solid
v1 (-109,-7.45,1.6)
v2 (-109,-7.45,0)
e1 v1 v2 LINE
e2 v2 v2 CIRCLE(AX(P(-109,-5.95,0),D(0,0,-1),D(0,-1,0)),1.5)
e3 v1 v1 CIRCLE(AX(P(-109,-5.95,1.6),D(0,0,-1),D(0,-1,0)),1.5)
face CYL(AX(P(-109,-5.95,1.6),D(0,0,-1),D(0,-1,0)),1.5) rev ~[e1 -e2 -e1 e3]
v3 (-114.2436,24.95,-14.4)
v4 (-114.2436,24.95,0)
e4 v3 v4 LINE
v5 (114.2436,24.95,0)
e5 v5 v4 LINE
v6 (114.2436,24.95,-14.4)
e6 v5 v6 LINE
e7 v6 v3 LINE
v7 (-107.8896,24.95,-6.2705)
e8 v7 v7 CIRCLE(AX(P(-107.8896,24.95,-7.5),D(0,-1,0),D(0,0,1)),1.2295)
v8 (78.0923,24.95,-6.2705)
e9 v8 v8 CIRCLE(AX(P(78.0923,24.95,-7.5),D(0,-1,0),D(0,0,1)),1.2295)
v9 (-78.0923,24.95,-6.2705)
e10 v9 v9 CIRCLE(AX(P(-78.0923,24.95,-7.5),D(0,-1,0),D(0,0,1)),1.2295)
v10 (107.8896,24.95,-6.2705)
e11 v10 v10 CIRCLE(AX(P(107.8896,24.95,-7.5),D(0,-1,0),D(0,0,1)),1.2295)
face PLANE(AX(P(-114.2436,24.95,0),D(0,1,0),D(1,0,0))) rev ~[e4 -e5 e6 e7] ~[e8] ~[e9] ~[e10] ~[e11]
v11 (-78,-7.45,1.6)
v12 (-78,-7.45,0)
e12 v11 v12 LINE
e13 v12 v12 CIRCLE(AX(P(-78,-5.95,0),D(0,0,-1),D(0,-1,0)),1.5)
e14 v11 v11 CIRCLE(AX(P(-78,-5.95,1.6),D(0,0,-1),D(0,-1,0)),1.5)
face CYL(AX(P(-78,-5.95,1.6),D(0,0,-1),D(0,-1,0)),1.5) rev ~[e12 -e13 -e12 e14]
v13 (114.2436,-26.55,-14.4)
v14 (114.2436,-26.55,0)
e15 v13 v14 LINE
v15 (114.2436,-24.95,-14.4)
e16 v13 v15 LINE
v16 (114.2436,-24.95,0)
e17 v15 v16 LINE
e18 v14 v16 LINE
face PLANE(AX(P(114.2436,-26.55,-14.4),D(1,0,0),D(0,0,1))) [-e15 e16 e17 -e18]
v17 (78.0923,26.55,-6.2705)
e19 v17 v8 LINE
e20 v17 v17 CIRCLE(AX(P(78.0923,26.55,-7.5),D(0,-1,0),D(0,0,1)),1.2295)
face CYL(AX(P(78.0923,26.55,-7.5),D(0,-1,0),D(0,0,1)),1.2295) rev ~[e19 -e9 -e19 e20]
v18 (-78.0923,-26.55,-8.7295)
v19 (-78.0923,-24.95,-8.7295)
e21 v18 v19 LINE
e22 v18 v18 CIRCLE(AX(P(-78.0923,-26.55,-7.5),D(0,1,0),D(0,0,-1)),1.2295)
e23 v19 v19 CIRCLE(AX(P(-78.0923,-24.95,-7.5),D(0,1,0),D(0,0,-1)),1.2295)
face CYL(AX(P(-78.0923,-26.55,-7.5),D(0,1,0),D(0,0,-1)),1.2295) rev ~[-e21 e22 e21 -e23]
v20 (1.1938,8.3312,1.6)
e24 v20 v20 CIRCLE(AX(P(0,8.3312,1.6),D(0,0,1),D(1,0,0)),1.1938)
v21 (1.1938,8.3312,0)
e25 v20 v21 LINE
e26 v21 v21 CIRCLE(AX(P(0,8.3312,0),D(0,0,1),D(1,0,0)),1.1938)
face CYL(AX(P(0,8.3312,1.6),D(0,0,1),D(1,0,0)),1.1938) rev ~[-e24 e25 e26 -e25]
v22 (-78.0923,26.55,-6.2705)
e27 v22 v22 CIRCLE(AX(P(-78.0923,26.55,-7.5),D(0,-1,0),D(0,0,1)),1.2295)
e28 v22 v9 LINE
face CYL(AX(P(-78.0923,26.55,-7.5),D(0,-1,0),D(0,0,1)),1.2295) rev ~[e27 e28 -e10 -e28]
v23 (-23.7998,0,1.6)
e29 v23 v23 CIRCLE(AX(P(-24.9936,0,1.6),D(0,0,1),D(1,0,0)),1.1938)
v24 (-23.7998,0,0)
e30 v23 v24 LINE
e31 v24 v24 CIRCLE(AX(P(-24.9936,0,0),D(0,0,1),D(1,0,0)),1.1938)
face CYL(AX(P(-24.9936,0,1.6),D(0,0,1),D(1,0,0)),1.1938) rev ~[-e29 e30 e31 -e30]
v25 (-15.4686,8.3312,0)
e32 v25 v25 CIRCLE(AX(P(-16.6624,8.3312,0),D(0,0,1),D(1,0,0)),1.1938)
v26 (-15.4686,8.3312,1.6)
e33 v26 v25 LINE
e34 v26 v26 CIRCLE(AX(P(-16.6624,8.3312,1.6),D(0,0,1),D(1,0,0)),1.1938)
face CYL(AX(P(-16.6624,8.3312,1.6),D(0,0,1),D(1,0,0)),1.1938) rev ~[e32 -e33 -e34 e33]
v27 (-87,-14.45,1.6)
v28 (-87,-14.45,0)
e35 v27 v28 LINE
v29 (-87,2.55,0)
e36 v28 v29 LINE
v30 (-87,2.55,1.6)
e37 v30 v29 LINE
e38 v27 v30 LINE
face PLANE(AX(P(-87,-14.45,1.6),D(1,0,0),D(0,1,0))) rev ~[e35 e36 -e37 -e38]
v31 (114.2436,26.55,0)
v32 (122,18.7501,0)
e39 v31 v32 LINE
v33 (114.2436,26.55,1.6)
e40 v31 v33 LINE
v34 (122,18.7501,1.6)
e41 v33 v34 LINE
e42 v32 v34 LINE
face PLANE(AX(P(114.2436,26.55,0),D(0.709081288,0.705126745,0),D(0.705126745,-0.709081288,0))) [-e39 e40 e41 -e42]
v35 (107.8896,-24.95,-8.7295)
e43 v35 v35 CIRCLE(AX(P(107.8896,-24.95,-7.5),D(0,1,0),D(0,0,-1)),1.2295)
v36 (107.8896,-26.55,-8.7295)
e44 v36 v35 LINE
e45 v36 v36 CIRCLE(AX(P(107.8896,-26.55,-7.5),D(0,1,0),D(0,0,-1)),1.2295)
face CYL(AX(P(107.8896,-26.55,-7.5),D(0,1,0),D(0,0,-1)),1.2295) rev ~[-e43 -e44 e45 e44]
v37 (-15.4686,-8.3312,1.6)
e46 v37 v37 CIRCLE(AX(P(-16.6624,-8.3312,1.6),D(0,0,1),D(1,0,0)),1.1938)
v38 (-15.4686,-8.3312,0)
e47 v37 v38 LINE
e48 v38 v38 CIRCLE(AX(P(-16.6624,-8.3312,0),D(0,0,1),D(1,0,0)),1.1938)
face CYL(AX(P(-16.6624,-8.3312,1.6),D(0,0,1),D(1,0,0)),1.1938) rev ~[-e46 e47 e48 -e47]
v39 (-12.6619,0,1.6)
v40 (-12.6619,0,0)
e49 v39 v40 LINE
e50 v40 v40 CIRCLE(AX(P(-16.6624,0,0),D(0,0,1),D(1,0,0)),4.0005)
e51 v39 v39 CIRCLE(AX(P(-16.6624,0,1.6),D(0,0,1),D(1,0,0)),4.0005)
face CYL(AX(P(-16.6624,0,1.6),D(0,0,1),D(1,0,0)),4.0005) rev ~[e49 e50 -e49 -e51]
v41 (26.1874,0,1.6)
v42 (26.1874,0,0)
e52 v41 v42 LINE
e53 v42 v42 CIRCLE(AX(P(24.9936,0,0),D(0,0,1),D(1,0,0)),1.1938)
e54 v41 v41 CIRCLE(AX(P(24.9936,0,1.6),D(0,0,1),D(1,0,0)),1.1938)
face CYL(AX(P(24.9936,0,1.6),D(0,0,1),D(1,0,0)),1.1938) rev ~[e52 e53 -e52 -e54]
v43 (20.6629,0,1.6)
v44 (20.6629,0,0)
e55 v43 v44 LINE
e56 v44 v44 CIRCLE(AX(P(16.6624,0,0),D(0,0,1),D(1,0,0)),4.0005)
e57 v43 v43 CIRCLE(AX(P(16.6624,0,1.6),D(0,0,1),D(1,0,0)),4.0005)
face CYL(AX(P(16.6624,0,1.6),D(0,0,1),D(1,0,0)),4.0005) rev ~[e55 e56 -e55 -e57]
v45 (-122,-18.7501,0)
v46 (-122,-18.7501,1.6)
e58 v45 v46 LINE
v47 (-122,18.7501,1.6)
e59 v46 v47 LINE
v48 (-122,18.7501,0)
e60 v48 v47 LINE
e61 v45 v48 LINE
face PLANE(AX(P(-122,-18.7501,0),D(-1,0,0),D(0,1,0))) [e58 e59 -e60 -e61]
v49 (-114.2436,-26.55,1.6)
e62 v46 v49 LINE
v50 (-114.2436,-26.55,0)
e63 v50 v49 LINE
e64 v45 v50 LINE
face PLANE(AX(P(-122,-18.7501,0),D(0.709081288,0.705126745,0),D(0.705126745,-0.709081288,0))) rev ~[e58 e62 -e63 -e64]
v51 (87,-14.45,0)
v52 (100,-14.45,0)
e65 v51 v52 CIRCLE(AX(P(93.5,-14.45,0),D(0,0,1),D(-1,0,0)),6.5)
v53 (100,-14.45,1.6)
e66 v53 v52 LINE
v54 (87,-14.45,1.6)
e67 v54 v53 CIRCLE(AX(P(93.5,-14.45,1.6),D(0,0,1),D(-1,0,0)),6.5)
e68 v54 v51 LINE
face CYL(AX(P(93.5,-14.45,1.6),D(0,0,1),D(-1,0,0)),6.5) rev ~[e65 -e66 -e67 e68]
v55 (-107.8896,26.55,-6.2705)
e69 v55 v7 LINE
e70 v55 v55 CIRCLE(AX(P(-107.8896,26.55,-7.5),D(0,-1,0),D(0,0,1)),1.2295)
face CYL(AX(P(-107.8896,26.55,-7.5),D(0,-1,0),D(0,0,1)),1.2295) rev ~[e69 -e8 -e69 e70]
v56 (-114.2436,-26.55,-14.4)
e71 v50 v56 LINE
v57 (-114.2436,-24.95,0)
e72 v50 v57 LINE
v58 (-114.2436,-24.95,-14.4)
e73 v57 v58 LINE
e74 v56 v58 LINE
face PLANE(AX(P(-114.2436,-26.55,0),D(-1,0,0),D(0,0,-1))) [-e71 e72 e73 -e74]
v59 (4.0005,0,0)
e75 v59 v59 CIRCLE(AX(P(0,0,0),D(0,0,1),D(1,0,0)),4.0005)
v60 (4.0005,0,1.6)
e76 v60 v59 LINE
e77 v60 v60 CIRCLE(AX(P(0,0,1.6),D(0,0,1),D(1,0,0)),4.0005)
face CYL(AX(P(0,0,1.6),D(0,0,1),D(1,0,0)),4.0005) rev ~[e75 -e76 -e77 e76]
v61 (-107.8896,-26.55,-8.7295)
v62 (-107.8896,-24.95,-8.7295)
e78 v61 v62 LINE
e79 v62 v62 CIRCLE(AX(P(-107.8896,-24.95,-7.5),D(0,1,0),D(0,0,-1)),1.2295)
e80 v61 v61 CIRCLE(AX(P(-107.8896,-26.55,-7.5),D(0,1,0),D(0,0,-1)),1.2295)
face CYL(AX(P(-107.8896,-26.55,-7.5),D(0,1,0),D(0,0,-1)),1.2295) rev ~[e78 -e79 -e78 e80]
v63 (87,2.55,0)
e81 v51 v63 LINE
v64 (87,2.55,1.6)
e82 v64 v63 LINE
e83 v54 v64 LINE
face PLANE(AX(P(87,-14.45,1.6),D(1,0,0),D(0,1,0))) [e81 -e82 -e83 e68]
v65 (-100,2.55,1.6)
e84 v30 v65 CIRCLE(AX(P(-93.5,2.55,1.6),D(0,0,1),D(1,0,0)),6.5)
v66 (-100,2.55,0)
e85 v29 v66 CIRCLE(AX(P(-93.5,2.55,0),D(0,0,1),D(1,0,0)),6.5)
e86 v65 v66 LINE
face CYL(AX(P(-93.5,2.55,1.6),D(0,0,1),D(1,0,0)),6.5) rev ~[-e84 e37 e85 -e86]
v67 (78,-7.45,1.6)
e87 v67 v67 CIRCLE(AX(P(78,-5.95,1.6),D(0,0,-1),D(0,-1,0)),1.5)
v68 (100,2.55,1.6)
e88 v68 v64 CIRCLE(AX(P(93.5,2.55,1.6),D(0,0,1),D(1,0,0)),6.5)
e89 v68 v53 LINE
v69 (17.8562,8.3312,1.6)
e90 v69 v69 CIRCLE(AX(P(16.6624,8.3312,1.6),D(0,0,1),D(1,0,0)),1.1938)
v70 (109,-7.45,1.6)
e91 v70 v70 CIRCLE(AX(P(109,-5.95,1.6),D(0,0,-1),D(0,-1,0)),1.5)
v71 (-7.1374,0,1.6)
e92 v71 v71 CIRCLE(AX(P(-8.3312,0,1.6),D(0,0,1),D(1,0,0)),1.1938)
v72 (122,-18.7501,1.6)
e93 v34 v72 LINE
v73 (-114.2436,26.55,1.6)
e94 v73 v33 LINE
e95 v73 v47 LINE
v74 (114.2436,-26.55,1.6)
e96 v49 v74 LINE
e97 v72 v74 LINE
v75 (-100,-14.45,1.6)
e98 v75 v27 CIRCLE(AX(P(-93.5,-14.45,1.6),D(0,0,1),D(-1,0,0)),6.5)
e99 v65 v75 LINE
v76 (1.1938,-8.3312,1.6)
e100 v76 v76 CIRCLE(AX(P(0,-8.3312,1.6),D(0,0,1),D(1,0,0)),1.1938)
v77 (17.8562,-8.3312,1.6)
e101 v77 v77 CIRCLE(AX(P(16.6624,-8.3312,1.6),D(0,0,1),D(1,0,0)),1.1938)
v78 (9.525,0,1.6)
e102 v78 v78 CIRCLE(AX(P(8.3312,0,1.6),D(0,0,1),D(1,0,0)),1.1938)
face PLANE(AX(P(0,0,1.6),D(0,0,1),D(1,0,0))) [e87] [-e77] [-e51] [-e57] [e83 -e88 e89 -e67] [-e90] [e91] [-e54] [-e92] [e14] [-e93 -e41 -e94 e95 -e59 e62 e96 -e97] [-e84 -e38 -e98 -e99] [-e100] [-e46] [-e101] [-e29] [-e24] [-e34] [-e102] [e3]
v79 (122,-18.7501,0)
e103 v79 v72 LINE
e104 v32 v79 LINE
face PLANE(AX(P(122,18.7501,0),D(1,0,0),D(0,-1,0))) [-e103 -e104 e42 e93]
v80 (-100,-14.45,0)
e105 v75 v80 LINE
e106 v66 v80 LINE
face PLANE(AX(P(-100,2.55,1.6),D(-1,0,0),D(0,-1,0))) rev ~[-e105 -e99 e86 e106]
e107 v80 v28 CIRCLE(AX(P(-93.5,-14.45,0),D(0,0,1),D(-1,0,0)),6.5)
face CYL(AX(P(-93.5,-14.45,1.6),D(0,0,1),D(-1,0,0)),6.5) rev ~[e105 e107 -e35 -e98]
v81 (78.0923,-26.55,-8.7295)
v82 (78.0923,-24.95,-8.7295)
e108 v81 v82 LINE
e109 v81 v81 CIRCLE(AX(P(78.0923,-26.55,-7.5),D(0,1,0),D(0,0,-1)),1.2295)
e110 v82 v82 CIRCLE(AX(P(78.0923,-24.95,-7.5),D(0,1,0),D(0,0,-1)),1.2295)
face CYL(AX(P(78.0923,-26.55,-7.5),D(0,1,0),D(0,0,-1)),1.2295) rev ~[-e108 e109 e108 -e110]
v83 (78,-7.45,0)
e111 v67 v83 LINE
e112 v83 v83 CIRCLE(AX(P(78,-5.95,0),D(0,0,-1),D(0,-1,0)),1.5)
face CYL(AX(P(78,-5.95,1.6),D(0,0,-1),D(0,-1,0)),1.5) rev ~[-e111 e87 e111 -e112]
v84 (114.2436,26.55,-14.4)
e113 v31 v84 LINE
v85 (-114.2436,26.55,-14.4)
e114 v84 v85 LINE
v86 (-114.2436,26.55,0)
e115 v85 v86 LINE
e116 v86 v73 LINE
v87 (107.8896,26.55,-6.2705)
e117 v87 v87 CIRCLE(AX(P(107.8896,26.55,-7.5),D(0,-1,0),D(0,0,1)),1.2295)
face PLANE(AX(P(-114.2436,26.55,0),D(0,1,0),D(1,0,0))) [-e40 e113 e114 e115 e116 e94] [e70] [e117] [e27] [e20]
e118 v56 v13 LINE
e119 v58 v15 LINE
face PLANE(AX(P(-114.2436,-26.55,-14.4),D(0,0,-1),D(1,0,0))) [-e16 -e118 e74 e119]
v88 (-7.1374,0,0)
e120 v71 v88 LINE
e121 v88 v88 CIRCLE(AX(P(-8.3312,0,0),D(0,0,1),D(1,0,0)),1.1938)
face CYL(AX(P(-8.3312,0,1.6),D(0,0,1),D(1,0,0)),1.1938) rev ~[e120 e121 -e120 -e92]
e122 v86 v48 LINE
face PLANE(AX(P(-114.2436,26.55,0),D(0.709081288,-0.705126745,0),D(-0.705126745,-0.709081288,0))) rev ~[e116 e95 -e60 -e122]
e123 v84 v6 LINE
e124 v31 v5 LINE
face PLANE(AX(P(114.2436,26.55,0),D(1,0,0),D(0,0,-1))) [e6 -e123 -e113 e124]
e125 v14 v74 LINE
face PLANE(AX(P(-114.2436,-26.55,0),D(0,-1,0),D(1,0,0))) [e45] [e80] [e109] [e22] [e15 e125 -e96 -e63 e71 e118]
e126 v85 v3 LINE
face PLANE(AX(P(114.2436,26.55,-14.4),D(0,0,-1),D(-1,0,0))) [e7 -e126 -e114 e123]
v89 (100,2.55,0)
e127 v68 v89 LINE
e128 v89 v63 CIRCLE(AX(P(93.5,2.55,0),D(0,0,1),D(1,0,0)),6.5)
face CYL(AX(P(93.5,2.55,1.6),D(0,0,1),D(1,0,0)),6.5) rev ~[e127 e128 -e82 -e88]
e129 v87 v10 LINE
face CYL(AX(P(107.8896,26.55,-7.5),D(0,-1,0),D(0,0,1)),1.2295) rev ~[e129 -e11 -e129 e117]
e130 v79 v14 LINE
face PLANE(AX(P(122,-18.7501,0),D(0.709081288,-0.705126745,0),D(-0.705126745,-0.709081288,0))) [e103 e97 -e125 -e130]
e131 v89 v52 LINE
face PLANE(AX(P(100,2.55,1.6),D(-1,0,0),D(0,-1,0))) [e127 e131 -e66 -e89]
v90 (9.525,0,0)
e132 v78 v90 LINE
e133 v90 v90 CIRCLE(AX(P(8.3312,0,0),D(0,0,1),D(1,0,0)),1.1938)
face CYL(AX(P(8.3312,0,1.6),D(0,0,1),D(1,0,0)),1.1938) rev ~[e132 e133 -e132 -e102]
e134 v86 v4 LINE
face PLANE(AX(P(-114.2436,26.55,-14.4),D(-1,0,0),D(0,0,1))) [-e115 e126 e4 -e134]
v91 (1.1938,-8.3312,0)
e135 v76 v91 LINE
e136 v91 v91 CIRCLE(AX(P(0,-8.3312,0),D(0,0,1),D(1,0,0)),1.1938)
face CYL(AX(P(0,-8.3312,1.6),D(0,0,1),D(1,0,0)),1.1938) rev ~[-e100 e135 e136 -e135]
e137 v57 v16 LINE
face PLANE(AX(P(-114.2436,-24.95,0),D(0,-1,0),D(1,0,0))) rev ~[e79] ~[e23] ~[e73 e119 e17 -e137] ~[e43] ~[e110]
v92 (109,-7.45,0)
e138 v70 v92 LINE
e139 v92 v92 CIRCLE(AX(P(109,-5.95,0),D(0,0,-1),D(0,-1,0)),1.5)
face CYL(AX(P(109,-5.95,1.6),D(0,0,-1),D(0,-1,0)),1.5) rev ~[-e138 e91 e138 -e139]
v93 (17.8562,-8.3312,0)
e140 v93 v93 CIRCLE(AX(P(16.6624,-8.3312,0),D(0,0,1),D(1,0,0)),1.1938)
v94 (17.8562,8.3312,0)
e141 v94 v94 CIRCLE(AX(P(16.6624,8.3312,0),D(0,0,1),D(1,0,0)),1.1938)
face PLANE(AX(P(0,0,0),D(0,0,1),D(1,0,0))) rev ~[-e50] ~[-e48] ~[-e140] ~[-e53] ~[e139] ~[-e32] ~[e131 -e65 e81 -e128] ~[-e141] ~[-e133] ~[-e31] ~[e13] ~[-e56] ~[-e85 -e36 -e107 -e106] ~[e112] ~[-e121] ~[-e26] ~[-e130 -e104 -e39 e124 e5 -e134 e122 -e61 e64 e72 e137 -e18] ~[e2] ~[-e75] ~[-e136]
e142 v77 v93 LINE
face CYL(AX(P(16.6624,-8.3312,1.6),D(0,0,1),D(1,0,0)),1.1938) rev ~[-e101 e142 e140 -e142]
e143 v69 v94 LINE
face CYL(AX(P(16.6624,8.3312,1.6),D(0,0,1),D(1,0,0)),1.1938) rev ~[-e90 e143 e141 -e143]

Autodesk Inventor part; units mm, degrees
ref_plane "YZ Plane" through (0, 0, 0) normal (1, 0, 0) x (0, 1, 0)
ref_plane "XZ Plane" through (0, 0, 0) normal (0, 1, 0) x (-1, 0, 0)
ref_plane "XY Plane" through (0, 0, 0) normal (0, 0, 1) x (1, 0, 0)
sketch "Sketch1" plane through (0, 0, 0) normal (0, 0, 1) x (1, 0, 0)
  line L0 (-114.2436, 26.55) -> (114.2436, 26.55)
  line L1 (122, 18.7501) -> (122, -18.7501)
  line L2 (114.2436, -26.55) -> (-114.2436, -26.55)
  line L3 (-122, -18.7501) -> (-122, 18.7501)
  line L4 (114.2436, 26.55) -> (122, 18.7501)
  line L5 (122, -18.7501) -> (114.2436, -26.55)
  line L6 (0, 26.55) -> (0, -26.55)
  line L7 (-114.2436, 26.55) -> (-122, 18.7501)
  line L8 (-122, -18.7501) -> (-114.2436, -26.55)
  point P0 (0, 0)
  point P1 (-122, 0)
  point P2 (0, 26.55)
  point P3 (0, 0)
  dimension "d0" = 244
  dimension "d62" = 135.16
  dimension "d63" = 11
  dimension "d64" = 135.16
  dimension "d65" = 11
  dimension "d66" = 53.1
extrude "Extrusion5" add sketch "Sketch1" along normal blind 1.6
sketch "Sketch11" plane through (-114.2436, 26.55, 0) normal (0, 1, 0) x (1, 0, 0)
  line L0 (228.4872, 0) -> (0, 0) projected
  line L1 (0, 0) -> (0, -1.6) projected
  line L2 (228.4872, -1.6) -> (0, -1.6) projected
  line L3 (228.4872, 0) -> (228.4872, -1.6) projected
  line L4 (228.4872, 0) -> (0, 0) projected
  line L5 (0, 0) -> (228.4872, 0)
  line L6 (228.4872, 0) -> (228.4872, 14.4)
  line L7 (228.4872, 14.4) -> (0, 14.4)
  line L8 (0, 14.4) -> (0, 0)
  point P0 (114.2436, 0)
  dimension "d72" = 14.4
extrude "Extrusion6" add sketch "Sketch11" against normal blind 1.6 contours L0 L8 L7 L6
sketch "Sketch12" plane through (-114.2436, -26.55, 0) normal (0, -1, 0) x (1, 0, 0)
  line L0 (228.4872, -14.4) -> (228.4872, 0) projected
  line L1 (0, 0) -> (228.4872, 0) projected
  line L2 (0, 0) -> (0, -14.4) projected
  line L3 (0, -14.4) -> (228.4872, -14.4) projected
  line L4 (0, 0) -> (228.4872, 0) projected
  line L5 (0, 0) -> (228.4872, 0)
  line L6 (228.4872, 0) -> (228.4872, -14.4)
  line L7 (228.4872, -14.4) -> (0, -14.4)
  line L8 (0, -14.4) -> (0, 0)
  point P0 (114.2436, 0)
extrude "Extrusion7" add sketch "Sketch12" against normal blind 1.6
sketch "Sketch13" plane through (-114.2436, 26.55, 1.6) normal (0, 1, 0) x (1, 0, 0)
  line L0 (0, 1.6) -> (0, 0) projected
  line L1 (228.4872, 0) -> (0, 0) projected
  line L2 (228.4872, 1.6) -> (228.4872, 0) projected
  line L3 (228.4872, 1.6) -> (228.4872, 16) projected
  line L4 (228.4872, 16) -> (0, 16) projected
  line L5 (0, 16) -> (0, 1.6) projected
  line L6 (228.4872, 16) -> (0, 16) construction
  line L7 (114.2436, 16) -> (114.2436, 0) construction
  line L8 (36.1513, 9.1) -> (114.2436, 9.1) construction
  line L9 (114.2436, 9.1) -> (192.3359, 9.1) construction
  point P0 (114.2436, 1.6)
  point P1 (0, 8.8)
  point P2 (6.354, 9.1)
  point P3 (222.1332, 9.1)
  dimension "d79" = 6.354
  dimension "d80" = 6.354
  dimension "d110" = 6.9
  dimension "d111" = 6.9
  dimension "d112" = 156.1846
hole "Hole6" at (-78.0923, 26.55, -7.5) at (78.0923, 26.55, -7.5) at (-107.8896, 26.55, -7.5) at (107.8896, 26.55, -7.5) direction (0, -1, 0) diameter 2.459 end up to surface thread size "M3x0.5" class "6H" standard "ISO Metric profile"
sketch "Sketch14" plane through (-114.2436, -26.55, 1.6) normal (0, -1, 0) x (1, 0, 0)
  circle A0 centre (192.3359, -9.1) radius 1.2295 projected
  circle A1 centre (222.1332, -9.1) radius 1.2295 projected
  circle A2 centre (36.1513, -9.1) radius 1.2295 projected
  circle A3 centre (6.354, -9.1) radius 1.2295 projected
  point P0 (114.2436, -1.6)
hole "Hole7" at (-107.8896, -26.55, -7.5) at (-78.0923, -26.55, -7.5) at (78.0923, -26.55, -7.5) at (107.8896, -26.55, -7.5) direction (0, 1, 0) diameter 2.459 end up to surface thread size "M3x0.5" class "6H" standard "ISO Metric profile"
sketch "Sketch15" plane through (0, 0, 1.6) normal (0, 0, 1) x (1, 0, 0)
  line L0 (-93.5, 2.55) -> (-93.5, -14.45) construction
  line L1 (-100, 2.55) -> (-100, -14.45)
  line L2 (-87, -14.45) -> (-87, 2.55)
  arc A0 (-87, 2.55) -> (-100, 2.55) centre (-93.5, 2.55) ccw
  arc A1 (-100, -14.45) -> (-87, -14.45) centre (-93.5, -14.45) ccw
  line L3 (-122, 18.7501) -> (-122, -18.7501) projected
  line L4 (114.2436, 26.55) -> (-114.2436, 26.55) projected
  line L5 (0, 26.55) -> (0, -26.55)
  line L6 (-114.2436, -26.55) -> (114.2436, -26.55) projected
  line L7 (93.5, 2.55) -> (93.5, -14.45) construction
  line L8 (100, 2.55) -> (100, -14.45)
  line L9 (87, -14.45) -> (87, 2.55)
  arc A2 (100, 2.55) -> (87, 2.55) centre (93.5, 2.55) ccw
  arc A3 (87, -14.45) -> (100, -14.45) centre (93.5, -14.45) ccw
  point P0 (0, 0)
  point P1 (-93.5, -5.95)
  point P2 (93.5, -5.95)
  dimension "d95" = 17
  dimension "d96" = 13
  dimension "d97" = 22
  dimension "d98" = 24
extrude "Extrusion8" cut sketch "Sketch15" against normal through all
sketch "Sketch16" plane through (0, 0, 1.6) normal (0, 0, 1) x (1, 0, 0)
  line L0 (-109, -5.95) -> (-78, -5.95)
  line L1 (78, -5.95) -> (109, -5.95)
  arc A0 (-87, 2.55) -> (-100, 2.55) centre (-93.5, 2.55) ccw projected
  arc A1 (100, 2.55) -> (87, 2.55) centre (93.5, 2.55) ccw projected
  line L2 (-87, 2.55) -> (-87, -14.45) projected
  point P0 (0, 0)
  point P1 (-93.5, -5.95)
  point P2 (93.5, -5.95)
  point P3 (-87, -5.95)
  dimension "d101" = 31
  dimension "d102" = 31
hole "Hole8" at (-109, -5.95, 1.6) at (-78, -5.95, 1.6) at (78, -5.95, 1.6) at (109, -5.95, 1.6) direction (0, 0, -1) diameter 3 end through all
sketch "Sketch17" plane through (0, 0, 1.6) normal (0, 0, 1) x (1, 0, 0)
  circle A0 centre (0, 0) radius 4.0005
  circle A1 centre (0, 8.3312) radius 1.1938
  circle A2 centre (-8.3312, 0) radius 1.1938
  circle A3 centre (0, -8.3312) radius 1.1938
  circle A4 centre (8.3312, 0) radius 1.1938
  circle A5 centre (-16.6624, 0) radius 4.0005
  circle A6 centre (-16.6624, 8.3312) radius 1.1938
  circle A7 centre (-24.9936, 0) radius 1.1938
  circle A8 centre (-16.6624, -8.3312) radius 1.1938
  circle A9 centre (-8.3312, 0) radius 1.1938
  circle A10 centre (16.6624, 0) radius 4.0005
  circle A11 centre (16.6624, 8.3312) radius 1.1938
  circle A12 centre (8.3312, 0) radius 1.1938
  circle A13 centre (16.6624, -8.3312) radius 1.1938
  circle A14 centre (24.9936, 0) radius 1.1938
  circle A15 centre (78, -5.95) radius 1.5 projected
  circle A16 centre (-109, -5.95) radius 1.5 projected
  circle A17 centre (-78, -5.95) radius 1.5 projected
  circle A18 centre (109, -5.95) radius 1.5 projected
  arc A19 (-100, -14.45) -> (-87, -14.45) centre (-93.5, -14.45) ccw projected
  line L0 (-100, -14.45) -> (-100, 2.55) projected
  arc A20 (-87, 2.55) -> (-100, 2.55) centre (-93.5, 2.55) ccw projected
  line L1 (-87, 2.55) -> (-87, -14.45) projected
  arc A21 (87, -14.45) -> (100, -14.45) centre (93.5, -14.45) ccw projected
  line L2 (87, -14.45) -> (87, 2.55) projected
  arc A22 (100, 2.55) -> (87, 2.55) centre (93.5, 2.55) ccw projected
  line L3 (100, 2.55) -> (100, -14.45) projected
  line L4 (122, -18.7501) -> (122, 18.7501) projected
  line L5 (122, 18.7501) -> (114.2436, 26.55) projected
  line L6 (114.2436, 26.55) -> (-114.2436, 26.55) projected
  line L7 (-114.2436, 26.55) -> (-122, 18.7501) projected
  line L8 (-122, 18.7501) -> (-122, -18.7501) projected
  line L9 (-122, -18.7501) -> (-114.2436, -26.55) projected
  line L10 (-114.2436, -26.55) -> (114.2436, -26.55) projected
  line L11 (114.2436, -26.55) -> (122, -18.7501) projected
  point P0 (0, 18.8)
  point P1 (0, 37.6)
  point P2 (201.549, 0)
  point P3 (0, 18.8)
  point P4 (0, 26.55)
  point P5 (-122, 0)
  dimension "d113" = 8.001
  dimension "d114" = 8.3312
  dimension "d115" = 2.3876
  dimension "d116" = 360
  dimension "d117" = 8.001
  dimension "d118" = 8.3312
  dimension "d119" = 2.3876
  dimension "d120" = 360
  dimension "d121" = 8.001
  dimension "d122" = 8.3312
  dimension "d123" = 2.3876
  dimension "d124" = 360
  dimension "d125" = 16.6624
  dimension "d126" = 16.6624
  dimension "d130" = 43.1852
  dimension "d131" = 82.0064
  dimension "d132" = 73.216
  dimension "d133" = 86.4724
extrude "Extrusion9" cut sketch "Sketch17" against normal through all contours A0 | A1 | A2 | A3 | A4 | A5 | A6 | A7 | A8 | A10 | A11 | A13 | A14
equation "\"d64\" = d62"
equation "\"d79\" = d80"
equation "\"d111\" = d110"
equation "\"d126\" = d125"
properties part number "ChassisSideBracket"
